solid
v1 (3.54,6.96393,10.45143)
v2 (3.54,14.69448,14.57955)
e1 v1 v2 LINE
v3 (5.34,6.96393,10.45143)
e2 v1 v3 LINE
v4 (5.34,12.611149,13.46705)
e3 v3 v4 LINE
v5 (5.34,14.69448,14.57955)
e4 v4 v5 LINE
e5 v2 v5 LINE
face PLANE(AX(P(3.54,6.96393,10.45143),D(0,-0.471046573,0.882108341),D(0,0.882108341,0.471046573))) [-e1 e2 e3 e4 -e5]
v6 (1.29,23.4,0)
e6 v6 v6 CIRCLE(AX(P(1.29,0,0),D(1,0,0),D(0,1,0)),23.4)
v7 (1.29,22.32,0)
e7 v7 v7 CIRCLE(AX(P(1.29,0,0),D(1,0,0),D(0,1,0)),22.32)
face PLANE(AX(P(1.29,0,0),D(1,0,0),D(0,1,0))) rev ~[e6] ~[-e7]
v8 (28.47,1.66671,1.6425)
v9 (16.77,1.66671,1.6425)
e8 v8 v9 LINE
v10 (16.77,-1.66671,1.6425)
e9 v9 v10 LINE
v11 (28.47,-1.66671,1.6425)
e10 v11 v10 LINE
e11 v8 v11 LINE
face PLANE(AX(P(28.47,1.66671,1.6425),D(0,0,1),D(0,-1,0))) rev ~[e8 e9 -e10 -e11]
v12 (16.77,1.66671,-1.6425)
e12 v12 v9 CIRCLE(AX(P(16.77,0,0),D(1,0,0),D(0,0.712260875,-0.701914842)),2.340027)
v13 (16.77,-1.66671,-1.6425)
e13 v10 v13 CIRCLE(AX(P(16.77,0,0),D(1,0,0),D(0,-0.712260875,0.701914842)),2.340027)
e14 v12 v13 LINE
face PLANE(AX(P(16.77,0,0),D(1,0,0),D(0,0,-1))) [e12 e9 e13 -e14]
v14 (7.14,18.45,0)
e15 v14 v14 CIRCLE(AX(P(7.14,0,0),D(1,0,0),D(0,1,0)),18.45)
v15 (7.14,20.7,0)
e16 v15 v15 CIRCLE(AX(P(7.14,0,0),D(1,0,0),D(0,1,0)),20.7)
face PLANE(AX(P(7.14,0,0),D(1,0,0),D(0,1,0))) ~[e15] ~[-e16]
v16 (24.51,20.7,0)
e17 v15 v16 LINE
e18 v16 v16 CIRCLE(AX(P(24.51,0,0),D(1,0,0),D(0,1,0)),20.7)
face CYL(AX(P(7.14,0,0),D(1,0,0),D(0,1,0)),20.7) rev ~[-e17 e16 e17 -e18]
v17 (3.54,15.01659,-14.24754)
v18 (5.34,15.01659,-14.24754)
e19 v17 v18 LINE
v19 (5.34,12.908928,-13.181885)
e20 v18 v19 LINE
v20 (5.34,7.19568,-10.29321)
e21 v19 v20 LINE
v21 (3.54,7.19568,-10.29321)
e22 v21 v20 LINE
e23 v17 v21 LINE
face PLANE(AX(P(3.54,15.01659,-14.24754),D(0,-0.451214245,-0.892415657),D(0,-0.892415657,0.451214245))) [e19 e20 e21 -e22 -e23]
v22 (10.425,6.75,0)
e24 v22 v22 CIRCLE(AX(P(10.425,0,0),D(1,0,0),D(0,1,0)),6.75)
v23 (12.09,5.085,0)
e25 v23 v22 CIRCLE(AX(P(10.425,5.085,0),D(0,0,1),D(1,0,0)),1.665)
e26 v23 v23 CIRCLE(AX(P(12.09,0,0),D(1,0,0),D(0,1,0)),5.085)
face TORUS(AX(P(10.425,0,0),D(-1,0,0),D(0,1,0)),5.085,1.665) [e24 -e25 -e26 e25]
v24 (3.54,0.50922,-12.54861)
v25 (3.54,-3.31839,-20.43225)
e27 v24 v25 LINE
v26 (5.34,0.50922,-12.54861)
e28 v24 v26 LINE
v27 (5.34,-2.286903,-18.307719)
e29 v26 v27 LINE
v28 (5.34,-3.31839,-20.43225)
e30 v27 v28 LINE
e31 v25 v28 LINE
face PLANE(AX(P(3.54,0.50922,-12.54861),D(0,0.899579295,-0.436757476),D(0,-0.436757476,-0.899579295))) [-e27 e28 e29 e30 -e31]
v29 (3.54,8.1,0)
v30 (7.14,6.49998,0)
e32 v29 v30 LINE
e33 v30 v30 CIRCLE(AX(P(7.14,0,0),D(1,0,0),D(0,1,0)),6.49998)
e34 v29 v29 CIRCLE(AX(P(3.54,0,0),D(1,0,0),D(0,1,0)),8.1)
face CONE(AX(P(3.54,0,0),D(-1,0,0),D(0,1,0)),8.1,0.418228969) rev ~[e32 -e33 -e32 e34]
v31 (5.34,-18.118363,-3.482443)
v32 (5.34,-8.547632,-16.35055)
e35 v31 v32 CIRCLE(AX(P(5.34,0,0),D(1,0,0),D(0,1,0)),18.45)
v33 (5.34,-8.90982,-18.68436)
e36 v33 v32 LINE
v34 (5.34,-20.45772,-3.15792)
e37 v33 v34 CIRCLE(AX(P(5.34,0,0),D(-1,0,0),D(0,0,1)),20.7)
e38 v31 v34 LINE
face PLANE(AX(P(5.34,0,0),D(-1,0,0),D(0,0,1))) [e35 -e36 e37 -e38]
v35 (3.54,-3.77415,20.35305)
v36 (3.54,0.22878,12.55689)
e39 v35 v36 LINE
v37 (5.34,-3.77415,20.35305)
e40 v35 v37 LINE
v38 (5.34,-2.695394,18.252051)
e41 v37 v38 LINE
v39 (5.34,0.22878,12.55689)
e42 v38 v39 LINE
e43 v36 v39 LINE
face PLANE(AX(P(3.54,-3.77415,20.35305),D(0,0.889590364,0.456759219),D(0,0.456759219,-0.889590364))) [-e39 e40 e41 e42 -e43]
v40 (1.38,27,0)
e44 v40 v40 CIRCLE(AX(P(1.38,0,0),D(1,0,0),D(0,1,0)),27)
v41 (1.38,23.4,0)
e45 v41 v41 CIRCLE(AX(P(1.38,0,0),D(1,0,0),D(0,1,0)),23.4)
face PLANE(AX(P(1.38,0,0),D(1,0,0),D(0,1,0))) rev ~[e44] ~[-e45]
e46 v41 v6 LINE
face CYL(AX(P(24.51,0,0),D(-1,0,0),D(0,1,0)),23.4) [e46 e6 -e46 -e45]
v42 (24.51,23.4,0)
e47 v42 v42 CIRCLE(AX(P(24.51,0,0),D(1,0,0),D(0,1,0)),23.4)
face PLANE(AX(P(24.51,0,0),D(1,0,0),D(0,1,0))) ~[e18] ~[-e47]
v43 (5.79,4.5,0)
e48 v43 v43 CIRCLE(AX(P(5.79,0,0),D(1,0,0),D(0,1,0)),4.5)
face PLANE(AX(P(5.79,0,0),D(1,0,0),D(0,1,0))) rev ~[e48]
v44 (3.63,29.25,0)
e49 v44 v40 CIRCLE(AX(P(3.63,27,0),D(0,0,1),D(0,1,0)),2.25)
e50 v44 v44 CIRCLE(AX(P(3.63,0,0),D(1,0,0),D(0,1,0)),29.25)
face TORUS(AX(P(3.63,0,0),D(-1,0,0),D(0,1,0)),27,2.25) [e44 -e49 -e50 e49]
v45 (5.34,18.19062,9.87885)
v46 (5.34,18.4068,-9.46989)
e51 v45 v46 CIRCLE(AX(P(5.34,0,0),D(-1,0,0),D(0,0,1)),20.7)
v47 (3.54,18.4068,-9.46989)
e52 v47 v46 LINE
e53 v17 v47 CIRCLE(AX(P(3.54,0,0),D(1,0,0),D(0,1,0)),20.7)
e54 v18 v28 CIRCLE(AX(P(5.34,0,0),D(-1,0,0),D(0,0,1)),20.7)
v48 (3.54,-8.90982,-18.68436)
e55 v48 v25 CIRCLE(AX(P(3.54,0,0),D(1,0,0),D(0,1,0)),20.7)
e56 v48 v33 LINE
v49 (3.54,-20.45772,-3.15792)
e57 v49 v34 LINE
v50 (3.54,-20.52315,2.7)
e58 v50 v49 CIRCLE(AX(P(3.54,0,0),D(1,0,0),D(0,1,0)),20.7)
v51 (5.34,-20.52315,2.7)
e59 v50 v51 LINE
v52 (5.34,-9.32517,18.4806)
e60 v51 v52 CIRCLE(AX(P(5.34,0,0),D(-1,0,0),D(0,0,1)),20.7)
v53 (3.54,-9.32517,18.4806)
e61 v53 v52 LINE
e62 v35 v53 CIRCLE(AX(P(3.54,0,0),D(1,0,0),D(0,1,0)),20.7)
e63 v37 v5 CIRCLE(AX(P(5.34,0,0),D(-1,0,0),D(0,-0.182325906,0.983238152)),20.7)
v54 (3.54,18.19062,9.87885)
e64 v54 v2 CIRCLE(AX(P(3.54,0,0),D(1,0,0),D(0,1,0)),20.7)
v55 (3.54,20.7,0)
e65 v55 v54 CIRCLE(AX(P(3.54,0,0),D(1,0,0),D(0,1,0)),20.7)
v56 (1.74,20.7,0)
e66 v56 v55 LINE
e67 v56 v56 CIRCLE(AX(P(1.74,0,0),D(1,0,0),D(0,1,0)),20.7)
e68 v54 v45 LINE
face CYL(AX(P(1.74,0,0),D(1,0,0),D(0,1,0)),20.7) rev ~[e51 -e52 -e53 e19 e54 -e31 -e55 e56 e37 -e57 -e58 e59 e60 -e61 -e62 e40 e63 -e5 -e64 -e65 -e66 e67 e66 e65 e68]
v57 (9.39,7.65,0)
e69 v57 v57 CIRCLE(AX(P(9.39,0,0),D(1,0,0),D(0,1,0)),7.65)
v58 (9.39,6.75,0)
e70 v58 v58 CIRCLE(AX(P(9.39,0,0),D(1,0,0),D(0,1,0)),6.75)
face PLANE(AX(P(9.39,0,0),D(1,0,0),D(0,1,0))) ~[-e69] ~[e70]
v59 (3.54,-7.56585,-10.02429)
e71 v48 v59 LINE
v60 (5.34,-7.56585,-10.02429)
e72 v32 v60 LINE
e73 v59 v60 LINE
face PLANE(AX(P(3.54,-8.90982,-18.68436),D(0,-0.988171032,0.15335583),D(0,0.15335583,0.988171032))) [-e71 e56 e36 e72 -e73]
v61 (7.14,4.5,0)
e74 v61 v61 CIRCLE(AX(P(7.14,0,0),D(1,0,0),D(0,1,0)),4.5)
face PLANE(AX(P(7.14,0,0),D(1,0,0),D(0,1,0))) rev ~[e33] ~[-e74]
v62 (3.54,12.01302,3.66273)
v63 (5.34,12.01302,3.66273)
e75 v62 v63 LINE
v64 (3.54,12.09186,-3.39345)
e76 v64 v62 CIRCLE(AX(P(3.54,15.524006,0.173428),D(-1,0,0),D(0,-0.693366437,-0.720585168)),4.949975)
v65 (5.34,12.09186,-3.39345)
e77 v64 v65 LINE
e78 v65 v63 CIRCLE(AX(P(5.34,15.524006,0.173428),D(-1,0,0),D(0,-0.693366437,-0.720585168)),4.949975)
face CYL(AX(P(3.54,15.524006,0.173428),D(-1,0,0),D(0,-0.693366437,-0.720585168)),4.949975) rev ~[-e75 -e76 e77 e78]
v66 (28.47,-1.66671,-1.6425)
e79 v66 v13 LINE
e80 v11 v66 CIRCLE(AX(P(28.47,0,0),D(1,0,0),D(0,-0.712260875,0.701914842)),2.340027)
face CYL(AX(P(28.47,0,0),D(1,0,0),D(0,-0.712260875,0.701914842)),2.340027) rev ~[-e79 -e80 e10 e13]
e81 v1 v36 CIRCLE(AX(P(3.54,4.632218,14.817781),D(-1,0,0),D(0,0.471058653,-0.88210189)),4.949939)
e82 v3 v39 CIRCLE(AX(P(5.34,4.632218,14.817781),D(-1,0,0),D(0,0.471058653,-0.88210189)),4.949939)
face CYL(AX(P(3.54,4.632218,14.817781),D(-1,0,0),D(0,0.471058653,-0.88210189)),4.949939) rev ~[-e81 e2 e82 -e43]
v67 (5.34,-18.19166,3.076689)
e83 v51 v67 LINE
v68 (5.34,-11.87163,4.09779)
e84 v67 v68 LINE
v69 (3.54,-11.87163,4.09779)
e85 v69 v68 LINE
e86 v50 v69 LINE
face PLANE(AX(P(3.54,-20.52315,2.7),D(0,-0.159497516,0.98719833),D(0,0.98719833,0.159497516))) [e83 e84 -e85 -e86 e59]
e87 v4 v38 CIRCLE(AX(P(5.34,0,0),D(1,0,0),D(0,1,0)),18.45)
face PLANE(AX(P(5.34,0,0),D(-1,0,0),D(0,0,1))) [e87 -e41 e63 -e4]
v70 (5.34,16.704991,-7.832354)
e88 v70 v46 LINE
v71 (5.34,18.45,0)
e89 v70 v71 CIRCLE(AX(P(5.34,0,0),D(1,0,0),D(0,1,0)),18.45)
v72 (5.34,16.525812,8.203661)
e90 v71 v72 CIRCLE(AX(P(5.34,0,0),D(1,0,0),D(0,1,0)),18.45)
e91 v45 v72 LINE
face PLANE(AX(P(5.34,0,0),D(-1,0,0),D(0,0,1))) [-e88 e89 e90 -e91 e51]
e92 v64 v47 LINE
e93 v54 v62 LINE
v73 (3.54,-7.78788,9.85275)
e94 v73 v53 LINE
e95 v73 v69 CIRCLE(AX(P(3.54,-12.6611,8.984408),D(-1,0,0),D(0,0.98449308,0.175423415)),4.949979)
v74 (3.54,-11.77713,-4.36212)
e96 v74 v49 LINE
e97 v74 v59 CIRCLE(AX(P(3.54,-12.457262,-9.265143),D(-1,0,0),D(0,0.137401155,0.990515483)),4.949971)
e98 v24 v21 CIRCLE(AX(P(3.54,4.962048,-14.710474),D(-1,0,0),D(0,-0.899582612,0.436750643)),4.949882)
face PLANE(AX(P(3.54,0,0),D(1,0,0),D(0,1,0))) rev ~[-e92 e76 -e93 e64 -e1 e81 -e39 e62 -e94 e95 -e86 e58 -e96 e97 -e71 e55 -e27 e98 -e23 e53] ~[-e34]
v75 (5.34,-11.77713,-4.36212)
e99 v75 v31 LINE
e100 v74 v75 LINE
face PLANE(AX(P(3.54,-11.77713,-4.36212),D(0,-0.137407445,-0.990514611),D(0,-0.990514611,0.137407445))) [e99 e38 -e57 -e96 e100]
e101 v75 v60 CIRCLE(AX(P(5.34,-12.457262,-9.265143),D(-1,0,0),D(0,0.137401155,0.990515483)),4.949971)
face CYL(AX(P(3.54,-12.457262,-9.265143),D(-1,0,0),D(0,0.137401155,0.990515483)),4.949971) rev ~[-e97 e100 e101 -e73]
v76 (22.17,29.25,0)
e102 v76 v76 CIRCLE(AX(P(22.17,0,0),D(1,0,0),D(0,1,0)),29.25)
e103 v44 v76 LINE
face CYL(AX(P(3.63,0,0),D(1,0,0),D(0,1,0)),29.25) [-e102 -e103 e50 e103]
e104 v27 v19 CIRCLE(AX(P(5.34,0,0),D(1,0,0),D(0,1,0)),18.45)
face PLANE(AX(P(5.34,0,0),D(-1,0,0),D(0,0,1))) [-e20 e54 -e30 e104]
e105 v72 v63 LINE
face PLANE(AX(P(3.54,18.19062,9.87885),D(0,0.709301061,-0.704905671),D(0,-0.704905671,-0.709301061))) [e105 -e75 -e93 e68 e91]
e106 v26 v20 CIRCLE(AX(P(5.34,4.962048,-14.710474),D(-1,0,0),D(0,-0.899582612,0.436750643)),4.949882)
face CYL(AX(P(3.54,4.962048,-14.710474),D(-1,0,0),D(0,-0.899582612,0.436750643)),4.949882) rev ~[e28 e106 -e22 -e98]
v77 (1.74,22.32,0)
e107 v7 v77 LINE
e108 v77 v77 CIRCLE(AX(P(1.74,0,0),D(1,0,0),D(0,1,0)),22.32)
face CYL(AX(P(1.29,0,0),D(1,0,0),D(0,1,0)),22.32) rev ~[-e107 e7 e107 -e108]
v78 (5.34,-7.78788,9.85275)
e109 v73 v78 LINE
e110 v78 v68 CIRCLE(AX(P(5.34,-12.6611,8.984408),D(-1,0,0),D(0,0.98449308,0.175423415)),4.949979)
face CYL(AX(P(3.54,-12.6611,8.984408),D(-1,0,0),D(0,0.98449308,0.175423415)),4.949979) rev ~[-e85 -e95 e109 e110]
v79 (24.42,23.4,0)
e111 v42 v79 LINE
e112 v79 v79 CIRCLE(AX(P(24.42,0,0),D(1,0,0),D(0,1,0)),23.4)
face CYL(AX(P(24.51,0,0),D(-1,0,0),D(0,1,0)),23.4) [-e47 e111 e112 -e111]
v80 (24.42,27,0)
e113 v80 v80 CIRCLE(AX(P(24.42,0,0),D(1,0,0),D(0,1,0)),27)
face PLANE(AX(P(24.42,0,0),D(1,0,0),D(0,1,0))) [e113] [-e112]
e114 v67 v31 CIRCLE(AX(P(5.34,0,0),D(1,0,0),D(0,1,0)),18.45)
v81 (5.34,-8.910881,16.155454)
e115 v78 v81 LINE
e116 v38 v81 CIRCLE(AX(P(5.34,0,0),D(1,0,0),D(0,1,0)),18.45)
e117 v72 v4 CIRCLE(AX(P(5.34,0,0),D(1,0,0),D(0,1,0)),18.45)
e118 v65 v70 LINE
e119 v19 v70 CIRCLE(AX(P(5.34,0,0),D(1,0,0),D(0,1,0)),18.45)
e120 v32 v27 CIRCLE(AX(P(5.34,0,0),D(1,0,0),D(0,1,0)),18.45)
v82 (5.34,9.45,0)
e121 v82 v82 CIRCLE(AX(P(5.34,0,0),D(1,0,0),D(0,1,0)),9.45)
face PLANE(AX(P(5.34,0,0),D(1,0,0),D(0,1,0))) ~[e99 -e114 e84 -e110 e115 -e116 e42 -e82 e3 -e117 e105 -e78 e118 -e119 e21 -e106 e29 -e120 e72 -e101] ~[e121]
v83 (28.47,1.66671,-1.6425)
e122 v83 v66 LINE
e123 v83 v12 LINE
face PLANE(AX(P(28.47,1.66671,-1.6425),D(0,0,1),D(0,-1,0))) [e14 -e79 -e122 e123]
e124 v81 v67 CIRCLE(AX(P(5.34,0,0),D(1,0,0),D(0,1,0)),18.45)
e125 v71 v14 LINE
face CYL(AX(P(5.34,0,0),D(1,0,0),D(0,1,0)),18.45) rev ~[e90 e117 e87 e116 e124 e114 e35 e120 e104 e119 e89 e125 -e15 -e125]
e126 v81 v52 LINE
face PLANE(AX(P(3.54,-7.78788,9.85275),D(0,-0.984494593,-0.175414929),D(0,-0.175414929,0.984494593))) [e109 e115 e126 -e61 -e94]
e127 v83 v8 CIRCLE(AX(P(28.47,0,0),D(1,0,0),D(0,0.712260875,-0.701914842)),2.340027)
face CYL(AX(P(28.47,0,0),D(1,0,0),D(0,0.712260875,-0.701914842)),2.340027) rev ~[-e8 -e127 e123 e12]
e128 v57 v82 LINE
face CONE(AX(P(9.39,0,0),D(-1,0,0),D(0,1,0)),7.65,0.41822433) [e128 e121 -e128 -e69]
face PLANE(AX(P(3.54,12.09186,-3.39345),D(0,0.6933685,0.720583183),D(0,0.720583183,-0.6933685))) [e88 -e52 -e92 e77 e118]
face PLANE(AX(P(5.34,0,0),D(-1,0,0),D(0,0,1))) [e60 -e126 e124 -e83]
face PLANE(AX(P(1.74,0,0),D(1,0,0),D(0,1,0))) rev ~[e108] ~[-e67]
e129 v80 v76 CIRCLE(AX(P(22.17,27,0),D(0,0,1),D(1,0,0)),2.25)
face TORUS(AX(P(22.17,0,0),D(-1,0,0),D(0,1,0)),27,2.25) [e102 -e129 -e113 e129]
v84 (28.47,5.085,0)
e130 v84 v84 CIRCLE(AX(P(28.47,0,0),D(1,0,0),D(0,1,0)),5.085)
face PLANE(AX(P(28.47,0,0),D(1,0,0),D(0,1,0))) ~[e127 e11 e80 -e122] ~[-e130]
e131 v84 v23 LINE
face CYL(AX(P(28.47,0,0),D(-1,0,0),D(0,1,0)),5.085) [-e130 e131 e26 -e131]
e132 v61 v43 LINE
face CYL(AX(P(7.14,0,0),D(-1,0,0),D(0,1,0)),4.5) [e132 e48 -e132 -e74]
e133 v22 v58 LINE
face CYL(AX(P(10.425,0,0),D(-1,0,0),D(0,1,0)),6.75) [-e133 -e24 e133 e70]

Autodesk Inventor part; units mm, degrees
ref_plane "YZ Plane" through (0, 0, 0) normal (1, 0, 0) x (0, 1, 0)
ref_plane "XZ Plane" through (0, 0, 0) normal (0, 1, 0) x (-1, 0, 0)
sketch "Sketch1" plane through (0, 0, 0) normal (0, 0, 1) x (1, 0, 0)
  line L0 (30.2, 0) -> (30.2, 5.65)
  line L1 (30.2, 5.65) -> (12, 5.65)
  arc A0 (12, 5.65) -> (10.15, 7.5) centre (10.15, 5.65) ccw
  line L2 (10.15, 7.5) -> (9, 7.5)
  line L3 (9, 7.5) -> (9, 8.5)
  line L4 (9, 8.5) -> (4.5, 10.5)
  line L5 (4.5, 10.5) -> (4.5, 20.5)
  line L6 (4.5, 20.5) -> (6.5, 20.5)
  line L7 (6.5, 20.5) -> (6.5, 23)
  line L8 (6.5, 23) -> (25.8, 23)
  line L9 (25.8, 23) -> (25.8, 26)
  line L10 (25.8, 26) -> (0, 26)
  line L11 (-6.04, 0) -> (36.24, 0) projected
  line L12 (0, 26) -> (0, 24.8)
  line L13 (0, 24.8) -> (0.5, 24.8)
  line L14 (2.5, 9) -> (6.5, 7.2222)
  line L15 (6.5, 7.2222) -> (6.5, 5)
  line L16 (6.5, 5) -> (5, 5)
  line L17 (5, 5) -> (5, 0)
  line L18 (0.5, 24.8) -> (0.5, 23)
  line L19 (0.5, 23) -> (2.5, 23)
  line L20 (2.5, 23) -> (2.5, 9)
  point P0 (0, 0)
  point P1 (21.1, 5.65)
  point P2 (0, 25.4)
  dimension "d2" = 11.3
  dimension "d3" = 52
  dimension "d4" = 15
  dimension "d5" = 3
  dimension "d6" = 7.5
  dimension "d7" = 25.8
  dimension "d8" = 21
  dimension "d9" = 1
  dimension "d10" = 18.2
  dimension "d11" = 3
  dimension "d12" = 1.2
  dimension "d13" = 0.5
  dimension "d14" = 10
  dimension "d15" = 1.5
  dimension "d16" = 5
  dimension "d17" = 30.2
  dimension "d18" = 18
  dimension "d19" = 2
  dimension "d20" = 41
  dimension "d23" = 2
revolve "Revolution1" add sketch "Sketch1" angle 360 about axis through (-10, 0, 0) along (1, 0, 0)
sketch "Sketch3" plane through (2.5, 0, 0) normal (-1, 0, 0) x (0, 0, 1)
  circle A0 centre (0, 0) radius 9 projected
  circle A1 centre (0, 0) radius 23 projected
  circle A2 centre (0, 0) radius 23 projected
  line L0 (3, -22.8035) -> (4.5531, -13.1907)
  arc A3 (10.9475, -8.6532) -> (4.5531, -13.1907) centre (9.9827, -14.068) ccw
  line L1 (10.9475, -8.6532) -> (20.534, -10.3613)
  circle A4 centre (0, 0) radius 5.65 construction
  line L2 (9.9827, -14.068) -> (0, 0) construction
  line L3 (0, -36.4) -> (0, 36.4) construction
  line L4 (22.6145, -4.1935) -> (13.9521, 0.2542)
  arc A5 (11.6127, 7.7377) -> (13.9521, 0.2542) centre (16.4643, 5.1469) ccw
  line L5 (16.4643, 5.1469) -> (0, 0) construction
  line L6 (11.6127, 7.7377) -> (16.1995, 16.3272)
  line L7 (10.9765, 20.2118) -> (4.0697, 13.3478)
  arc A6 (-3.7705, 13.4354) -> (4.0697, 13.3478) centre (0.1927, 17.2489) ccw
  line L8 (0.1927, 17.2489) -> (0, 0) construction
  line L9 (-3.7705, 13.4354) -> (-10.5221, 20.452)
  line L10 (-15.8306, 16.6851) -> (-11.4369, 7.9952)
  arc A7 (-13.9429, 0.5658) -> (-11.4369, 7.9952) centre (-16.3451, 5.5135) ccw
  line L11 (-16.3451, 5.5135) -> (0, 0) construction
  line L12 (-13.9429, 0.5658) -> (-22.7025, -3.6871)
  line L13 (-20.7604, -9.8998) -> (-11.1381, -8.4065)
  arc A8 (-4.8468, -13.0857) -> (-11.1381, -8.4065) centre (-10.2946, -13.8414) ccw
  line L14 (-10.2946, -13.8414) -> (0, 0) construction
  line L15 (-4.8468, -13.0857) -> (-3.5088, -22.7308)
  circle A9 centre (0, 0) radius 11.75 construction
  circle A10 centre (0, 0) radius 23 projected
  arc A11 (-15.8306, 16.6851) -> (-22.7025, -3.6871) centre (0, 0) ccw
  arc A12 (10.9765, 20.2118) -> (-10.5221, 20.452) centre (0, 0) ccw
  arc A13 (22.6145, -4.1935) -> (16.1995, 16.3272) centre (0, 0) ccw
  arc A14 (-20.7604, -9.8998) -> (-3.5088, -22.7308) centre (0, 0) ccw
  arc A15 (3, -22.8035) -> (20.534, -10.3613) centre (0, 0) ccw
  dimension "d24" = 3
  dimension "d25" = 21.5
  dimension "d28" = 360
  dimension "d30" = 23.5
  dimension "d31" = 5.5
extrude "Extrusion2" cut sketch "Sketch3" against normal blind 2 contours A1 L4 A5 L6 | L7 A6 L9 A1 | A1 L0 A3 L1 | L10 A7 L12 A1 | A1 L13 A8 L15
sketch "Sketch4" plane through (30.2, 0, 0) normal (1, 0, 0) x (0, 0, -1)
  line L0 (-1.825, 1.8519) -> (-1.825, -1.8519)
  line L1 (1.825, 1.8519) -> (1.825, -1.8519)
  arc A0 (-1.825, -1.8519) -> (1.825, -1.8519) centre (0, 0) ccw
  arc A1 (1.825, 1.8519) -> (-1.825, 1.8519) centre (0, 0) ccw
  dimension "d35" = 3.65
  dimension "d36" = 2.6
extrude "Extrusion3" cut sketch "Sketch4" against normal blind 13
ref_plane "Work Plane1" through (0, 0, 0) normal (0, -1, 0) x (1, 0, 0)
sketch "Sketch5" plane through (0, 0, 0) normal (0, -1, 0) x (1, 0, 0)
  line L0 (25.8, -26) -> (25.8, 26) projected
  line L1 (0, -26) -> (0, 26) projected
  line L2 (0, 26) -> (25.8, 26) projected
  line L3 (23.8, 26) -> (2, 26)
  line L4 (2, 26) -> (2, 24)
  line L5 (2, 24) -> (23.8, 24)
  line L6 (23.8, 24) -> (23.8, 26)
  line L7 (-6.04, 0) -> (36.24, 0) projected
  point P0 (0, 0)
  dimension "d40" = 2
  dimension "d41" = 2
  dimension "d42" = 2
revolve "Revolution2" cut sketch "Sketch5" angle 360 about axis through (-10, 0, 0) along (1, 0, 0) contours L6 L5 L4 L2
sketch "Sketch6" plane through (0, 0, 0) normal (0, 0, 1) x (1, 0, 0)
  line L0 (2, 24) -> (23.8, 24) projected
  line L1 (23.8, -26) -> (23.8, 26) projected
  line L2 (23.8, 26) -> (25.8, 26) projected
  line L3 (2, 26) -> (2, -26) projected
  line L4 (0, 26) -> (2, 26) projected
  arc A0 (2.6, 32.5) -> (0.1, 30) centre (2.6, 30) ccw
  line L5 (2.6, 32.5) -> (23.2, 32.5)
  arc A1 (25.7, 30) -> (23.2, 32.5) centre (23.2, 30) ccw
  line L6 (-6.6357, 0) -> (36.3393, 0) projected
  line L7 (0.1, 30) -> (0.1, 26)
  line L8 (25.7, 30) -> (25.7, 26)
  point P0 (0, 0)
  dimension "d44" = 65
  dimension "d45" = 2.5
  dimension "d46" = 0.1
  dimension "d47" = 0.1
revolve "Revolution3" add sketch "Sketch6" angle 360 about axis through (-10, 0, 0) along (1, 0, 0) contours L3 L4 L7 A0 L5 A1 L8 L2 L1 L0
scale "Scale1" factors (0.9, 0.9, 0.9) then translate (1.29, 0, 0) bodies 1
equation "\"d41\" = d40"
properties part number "velg"
